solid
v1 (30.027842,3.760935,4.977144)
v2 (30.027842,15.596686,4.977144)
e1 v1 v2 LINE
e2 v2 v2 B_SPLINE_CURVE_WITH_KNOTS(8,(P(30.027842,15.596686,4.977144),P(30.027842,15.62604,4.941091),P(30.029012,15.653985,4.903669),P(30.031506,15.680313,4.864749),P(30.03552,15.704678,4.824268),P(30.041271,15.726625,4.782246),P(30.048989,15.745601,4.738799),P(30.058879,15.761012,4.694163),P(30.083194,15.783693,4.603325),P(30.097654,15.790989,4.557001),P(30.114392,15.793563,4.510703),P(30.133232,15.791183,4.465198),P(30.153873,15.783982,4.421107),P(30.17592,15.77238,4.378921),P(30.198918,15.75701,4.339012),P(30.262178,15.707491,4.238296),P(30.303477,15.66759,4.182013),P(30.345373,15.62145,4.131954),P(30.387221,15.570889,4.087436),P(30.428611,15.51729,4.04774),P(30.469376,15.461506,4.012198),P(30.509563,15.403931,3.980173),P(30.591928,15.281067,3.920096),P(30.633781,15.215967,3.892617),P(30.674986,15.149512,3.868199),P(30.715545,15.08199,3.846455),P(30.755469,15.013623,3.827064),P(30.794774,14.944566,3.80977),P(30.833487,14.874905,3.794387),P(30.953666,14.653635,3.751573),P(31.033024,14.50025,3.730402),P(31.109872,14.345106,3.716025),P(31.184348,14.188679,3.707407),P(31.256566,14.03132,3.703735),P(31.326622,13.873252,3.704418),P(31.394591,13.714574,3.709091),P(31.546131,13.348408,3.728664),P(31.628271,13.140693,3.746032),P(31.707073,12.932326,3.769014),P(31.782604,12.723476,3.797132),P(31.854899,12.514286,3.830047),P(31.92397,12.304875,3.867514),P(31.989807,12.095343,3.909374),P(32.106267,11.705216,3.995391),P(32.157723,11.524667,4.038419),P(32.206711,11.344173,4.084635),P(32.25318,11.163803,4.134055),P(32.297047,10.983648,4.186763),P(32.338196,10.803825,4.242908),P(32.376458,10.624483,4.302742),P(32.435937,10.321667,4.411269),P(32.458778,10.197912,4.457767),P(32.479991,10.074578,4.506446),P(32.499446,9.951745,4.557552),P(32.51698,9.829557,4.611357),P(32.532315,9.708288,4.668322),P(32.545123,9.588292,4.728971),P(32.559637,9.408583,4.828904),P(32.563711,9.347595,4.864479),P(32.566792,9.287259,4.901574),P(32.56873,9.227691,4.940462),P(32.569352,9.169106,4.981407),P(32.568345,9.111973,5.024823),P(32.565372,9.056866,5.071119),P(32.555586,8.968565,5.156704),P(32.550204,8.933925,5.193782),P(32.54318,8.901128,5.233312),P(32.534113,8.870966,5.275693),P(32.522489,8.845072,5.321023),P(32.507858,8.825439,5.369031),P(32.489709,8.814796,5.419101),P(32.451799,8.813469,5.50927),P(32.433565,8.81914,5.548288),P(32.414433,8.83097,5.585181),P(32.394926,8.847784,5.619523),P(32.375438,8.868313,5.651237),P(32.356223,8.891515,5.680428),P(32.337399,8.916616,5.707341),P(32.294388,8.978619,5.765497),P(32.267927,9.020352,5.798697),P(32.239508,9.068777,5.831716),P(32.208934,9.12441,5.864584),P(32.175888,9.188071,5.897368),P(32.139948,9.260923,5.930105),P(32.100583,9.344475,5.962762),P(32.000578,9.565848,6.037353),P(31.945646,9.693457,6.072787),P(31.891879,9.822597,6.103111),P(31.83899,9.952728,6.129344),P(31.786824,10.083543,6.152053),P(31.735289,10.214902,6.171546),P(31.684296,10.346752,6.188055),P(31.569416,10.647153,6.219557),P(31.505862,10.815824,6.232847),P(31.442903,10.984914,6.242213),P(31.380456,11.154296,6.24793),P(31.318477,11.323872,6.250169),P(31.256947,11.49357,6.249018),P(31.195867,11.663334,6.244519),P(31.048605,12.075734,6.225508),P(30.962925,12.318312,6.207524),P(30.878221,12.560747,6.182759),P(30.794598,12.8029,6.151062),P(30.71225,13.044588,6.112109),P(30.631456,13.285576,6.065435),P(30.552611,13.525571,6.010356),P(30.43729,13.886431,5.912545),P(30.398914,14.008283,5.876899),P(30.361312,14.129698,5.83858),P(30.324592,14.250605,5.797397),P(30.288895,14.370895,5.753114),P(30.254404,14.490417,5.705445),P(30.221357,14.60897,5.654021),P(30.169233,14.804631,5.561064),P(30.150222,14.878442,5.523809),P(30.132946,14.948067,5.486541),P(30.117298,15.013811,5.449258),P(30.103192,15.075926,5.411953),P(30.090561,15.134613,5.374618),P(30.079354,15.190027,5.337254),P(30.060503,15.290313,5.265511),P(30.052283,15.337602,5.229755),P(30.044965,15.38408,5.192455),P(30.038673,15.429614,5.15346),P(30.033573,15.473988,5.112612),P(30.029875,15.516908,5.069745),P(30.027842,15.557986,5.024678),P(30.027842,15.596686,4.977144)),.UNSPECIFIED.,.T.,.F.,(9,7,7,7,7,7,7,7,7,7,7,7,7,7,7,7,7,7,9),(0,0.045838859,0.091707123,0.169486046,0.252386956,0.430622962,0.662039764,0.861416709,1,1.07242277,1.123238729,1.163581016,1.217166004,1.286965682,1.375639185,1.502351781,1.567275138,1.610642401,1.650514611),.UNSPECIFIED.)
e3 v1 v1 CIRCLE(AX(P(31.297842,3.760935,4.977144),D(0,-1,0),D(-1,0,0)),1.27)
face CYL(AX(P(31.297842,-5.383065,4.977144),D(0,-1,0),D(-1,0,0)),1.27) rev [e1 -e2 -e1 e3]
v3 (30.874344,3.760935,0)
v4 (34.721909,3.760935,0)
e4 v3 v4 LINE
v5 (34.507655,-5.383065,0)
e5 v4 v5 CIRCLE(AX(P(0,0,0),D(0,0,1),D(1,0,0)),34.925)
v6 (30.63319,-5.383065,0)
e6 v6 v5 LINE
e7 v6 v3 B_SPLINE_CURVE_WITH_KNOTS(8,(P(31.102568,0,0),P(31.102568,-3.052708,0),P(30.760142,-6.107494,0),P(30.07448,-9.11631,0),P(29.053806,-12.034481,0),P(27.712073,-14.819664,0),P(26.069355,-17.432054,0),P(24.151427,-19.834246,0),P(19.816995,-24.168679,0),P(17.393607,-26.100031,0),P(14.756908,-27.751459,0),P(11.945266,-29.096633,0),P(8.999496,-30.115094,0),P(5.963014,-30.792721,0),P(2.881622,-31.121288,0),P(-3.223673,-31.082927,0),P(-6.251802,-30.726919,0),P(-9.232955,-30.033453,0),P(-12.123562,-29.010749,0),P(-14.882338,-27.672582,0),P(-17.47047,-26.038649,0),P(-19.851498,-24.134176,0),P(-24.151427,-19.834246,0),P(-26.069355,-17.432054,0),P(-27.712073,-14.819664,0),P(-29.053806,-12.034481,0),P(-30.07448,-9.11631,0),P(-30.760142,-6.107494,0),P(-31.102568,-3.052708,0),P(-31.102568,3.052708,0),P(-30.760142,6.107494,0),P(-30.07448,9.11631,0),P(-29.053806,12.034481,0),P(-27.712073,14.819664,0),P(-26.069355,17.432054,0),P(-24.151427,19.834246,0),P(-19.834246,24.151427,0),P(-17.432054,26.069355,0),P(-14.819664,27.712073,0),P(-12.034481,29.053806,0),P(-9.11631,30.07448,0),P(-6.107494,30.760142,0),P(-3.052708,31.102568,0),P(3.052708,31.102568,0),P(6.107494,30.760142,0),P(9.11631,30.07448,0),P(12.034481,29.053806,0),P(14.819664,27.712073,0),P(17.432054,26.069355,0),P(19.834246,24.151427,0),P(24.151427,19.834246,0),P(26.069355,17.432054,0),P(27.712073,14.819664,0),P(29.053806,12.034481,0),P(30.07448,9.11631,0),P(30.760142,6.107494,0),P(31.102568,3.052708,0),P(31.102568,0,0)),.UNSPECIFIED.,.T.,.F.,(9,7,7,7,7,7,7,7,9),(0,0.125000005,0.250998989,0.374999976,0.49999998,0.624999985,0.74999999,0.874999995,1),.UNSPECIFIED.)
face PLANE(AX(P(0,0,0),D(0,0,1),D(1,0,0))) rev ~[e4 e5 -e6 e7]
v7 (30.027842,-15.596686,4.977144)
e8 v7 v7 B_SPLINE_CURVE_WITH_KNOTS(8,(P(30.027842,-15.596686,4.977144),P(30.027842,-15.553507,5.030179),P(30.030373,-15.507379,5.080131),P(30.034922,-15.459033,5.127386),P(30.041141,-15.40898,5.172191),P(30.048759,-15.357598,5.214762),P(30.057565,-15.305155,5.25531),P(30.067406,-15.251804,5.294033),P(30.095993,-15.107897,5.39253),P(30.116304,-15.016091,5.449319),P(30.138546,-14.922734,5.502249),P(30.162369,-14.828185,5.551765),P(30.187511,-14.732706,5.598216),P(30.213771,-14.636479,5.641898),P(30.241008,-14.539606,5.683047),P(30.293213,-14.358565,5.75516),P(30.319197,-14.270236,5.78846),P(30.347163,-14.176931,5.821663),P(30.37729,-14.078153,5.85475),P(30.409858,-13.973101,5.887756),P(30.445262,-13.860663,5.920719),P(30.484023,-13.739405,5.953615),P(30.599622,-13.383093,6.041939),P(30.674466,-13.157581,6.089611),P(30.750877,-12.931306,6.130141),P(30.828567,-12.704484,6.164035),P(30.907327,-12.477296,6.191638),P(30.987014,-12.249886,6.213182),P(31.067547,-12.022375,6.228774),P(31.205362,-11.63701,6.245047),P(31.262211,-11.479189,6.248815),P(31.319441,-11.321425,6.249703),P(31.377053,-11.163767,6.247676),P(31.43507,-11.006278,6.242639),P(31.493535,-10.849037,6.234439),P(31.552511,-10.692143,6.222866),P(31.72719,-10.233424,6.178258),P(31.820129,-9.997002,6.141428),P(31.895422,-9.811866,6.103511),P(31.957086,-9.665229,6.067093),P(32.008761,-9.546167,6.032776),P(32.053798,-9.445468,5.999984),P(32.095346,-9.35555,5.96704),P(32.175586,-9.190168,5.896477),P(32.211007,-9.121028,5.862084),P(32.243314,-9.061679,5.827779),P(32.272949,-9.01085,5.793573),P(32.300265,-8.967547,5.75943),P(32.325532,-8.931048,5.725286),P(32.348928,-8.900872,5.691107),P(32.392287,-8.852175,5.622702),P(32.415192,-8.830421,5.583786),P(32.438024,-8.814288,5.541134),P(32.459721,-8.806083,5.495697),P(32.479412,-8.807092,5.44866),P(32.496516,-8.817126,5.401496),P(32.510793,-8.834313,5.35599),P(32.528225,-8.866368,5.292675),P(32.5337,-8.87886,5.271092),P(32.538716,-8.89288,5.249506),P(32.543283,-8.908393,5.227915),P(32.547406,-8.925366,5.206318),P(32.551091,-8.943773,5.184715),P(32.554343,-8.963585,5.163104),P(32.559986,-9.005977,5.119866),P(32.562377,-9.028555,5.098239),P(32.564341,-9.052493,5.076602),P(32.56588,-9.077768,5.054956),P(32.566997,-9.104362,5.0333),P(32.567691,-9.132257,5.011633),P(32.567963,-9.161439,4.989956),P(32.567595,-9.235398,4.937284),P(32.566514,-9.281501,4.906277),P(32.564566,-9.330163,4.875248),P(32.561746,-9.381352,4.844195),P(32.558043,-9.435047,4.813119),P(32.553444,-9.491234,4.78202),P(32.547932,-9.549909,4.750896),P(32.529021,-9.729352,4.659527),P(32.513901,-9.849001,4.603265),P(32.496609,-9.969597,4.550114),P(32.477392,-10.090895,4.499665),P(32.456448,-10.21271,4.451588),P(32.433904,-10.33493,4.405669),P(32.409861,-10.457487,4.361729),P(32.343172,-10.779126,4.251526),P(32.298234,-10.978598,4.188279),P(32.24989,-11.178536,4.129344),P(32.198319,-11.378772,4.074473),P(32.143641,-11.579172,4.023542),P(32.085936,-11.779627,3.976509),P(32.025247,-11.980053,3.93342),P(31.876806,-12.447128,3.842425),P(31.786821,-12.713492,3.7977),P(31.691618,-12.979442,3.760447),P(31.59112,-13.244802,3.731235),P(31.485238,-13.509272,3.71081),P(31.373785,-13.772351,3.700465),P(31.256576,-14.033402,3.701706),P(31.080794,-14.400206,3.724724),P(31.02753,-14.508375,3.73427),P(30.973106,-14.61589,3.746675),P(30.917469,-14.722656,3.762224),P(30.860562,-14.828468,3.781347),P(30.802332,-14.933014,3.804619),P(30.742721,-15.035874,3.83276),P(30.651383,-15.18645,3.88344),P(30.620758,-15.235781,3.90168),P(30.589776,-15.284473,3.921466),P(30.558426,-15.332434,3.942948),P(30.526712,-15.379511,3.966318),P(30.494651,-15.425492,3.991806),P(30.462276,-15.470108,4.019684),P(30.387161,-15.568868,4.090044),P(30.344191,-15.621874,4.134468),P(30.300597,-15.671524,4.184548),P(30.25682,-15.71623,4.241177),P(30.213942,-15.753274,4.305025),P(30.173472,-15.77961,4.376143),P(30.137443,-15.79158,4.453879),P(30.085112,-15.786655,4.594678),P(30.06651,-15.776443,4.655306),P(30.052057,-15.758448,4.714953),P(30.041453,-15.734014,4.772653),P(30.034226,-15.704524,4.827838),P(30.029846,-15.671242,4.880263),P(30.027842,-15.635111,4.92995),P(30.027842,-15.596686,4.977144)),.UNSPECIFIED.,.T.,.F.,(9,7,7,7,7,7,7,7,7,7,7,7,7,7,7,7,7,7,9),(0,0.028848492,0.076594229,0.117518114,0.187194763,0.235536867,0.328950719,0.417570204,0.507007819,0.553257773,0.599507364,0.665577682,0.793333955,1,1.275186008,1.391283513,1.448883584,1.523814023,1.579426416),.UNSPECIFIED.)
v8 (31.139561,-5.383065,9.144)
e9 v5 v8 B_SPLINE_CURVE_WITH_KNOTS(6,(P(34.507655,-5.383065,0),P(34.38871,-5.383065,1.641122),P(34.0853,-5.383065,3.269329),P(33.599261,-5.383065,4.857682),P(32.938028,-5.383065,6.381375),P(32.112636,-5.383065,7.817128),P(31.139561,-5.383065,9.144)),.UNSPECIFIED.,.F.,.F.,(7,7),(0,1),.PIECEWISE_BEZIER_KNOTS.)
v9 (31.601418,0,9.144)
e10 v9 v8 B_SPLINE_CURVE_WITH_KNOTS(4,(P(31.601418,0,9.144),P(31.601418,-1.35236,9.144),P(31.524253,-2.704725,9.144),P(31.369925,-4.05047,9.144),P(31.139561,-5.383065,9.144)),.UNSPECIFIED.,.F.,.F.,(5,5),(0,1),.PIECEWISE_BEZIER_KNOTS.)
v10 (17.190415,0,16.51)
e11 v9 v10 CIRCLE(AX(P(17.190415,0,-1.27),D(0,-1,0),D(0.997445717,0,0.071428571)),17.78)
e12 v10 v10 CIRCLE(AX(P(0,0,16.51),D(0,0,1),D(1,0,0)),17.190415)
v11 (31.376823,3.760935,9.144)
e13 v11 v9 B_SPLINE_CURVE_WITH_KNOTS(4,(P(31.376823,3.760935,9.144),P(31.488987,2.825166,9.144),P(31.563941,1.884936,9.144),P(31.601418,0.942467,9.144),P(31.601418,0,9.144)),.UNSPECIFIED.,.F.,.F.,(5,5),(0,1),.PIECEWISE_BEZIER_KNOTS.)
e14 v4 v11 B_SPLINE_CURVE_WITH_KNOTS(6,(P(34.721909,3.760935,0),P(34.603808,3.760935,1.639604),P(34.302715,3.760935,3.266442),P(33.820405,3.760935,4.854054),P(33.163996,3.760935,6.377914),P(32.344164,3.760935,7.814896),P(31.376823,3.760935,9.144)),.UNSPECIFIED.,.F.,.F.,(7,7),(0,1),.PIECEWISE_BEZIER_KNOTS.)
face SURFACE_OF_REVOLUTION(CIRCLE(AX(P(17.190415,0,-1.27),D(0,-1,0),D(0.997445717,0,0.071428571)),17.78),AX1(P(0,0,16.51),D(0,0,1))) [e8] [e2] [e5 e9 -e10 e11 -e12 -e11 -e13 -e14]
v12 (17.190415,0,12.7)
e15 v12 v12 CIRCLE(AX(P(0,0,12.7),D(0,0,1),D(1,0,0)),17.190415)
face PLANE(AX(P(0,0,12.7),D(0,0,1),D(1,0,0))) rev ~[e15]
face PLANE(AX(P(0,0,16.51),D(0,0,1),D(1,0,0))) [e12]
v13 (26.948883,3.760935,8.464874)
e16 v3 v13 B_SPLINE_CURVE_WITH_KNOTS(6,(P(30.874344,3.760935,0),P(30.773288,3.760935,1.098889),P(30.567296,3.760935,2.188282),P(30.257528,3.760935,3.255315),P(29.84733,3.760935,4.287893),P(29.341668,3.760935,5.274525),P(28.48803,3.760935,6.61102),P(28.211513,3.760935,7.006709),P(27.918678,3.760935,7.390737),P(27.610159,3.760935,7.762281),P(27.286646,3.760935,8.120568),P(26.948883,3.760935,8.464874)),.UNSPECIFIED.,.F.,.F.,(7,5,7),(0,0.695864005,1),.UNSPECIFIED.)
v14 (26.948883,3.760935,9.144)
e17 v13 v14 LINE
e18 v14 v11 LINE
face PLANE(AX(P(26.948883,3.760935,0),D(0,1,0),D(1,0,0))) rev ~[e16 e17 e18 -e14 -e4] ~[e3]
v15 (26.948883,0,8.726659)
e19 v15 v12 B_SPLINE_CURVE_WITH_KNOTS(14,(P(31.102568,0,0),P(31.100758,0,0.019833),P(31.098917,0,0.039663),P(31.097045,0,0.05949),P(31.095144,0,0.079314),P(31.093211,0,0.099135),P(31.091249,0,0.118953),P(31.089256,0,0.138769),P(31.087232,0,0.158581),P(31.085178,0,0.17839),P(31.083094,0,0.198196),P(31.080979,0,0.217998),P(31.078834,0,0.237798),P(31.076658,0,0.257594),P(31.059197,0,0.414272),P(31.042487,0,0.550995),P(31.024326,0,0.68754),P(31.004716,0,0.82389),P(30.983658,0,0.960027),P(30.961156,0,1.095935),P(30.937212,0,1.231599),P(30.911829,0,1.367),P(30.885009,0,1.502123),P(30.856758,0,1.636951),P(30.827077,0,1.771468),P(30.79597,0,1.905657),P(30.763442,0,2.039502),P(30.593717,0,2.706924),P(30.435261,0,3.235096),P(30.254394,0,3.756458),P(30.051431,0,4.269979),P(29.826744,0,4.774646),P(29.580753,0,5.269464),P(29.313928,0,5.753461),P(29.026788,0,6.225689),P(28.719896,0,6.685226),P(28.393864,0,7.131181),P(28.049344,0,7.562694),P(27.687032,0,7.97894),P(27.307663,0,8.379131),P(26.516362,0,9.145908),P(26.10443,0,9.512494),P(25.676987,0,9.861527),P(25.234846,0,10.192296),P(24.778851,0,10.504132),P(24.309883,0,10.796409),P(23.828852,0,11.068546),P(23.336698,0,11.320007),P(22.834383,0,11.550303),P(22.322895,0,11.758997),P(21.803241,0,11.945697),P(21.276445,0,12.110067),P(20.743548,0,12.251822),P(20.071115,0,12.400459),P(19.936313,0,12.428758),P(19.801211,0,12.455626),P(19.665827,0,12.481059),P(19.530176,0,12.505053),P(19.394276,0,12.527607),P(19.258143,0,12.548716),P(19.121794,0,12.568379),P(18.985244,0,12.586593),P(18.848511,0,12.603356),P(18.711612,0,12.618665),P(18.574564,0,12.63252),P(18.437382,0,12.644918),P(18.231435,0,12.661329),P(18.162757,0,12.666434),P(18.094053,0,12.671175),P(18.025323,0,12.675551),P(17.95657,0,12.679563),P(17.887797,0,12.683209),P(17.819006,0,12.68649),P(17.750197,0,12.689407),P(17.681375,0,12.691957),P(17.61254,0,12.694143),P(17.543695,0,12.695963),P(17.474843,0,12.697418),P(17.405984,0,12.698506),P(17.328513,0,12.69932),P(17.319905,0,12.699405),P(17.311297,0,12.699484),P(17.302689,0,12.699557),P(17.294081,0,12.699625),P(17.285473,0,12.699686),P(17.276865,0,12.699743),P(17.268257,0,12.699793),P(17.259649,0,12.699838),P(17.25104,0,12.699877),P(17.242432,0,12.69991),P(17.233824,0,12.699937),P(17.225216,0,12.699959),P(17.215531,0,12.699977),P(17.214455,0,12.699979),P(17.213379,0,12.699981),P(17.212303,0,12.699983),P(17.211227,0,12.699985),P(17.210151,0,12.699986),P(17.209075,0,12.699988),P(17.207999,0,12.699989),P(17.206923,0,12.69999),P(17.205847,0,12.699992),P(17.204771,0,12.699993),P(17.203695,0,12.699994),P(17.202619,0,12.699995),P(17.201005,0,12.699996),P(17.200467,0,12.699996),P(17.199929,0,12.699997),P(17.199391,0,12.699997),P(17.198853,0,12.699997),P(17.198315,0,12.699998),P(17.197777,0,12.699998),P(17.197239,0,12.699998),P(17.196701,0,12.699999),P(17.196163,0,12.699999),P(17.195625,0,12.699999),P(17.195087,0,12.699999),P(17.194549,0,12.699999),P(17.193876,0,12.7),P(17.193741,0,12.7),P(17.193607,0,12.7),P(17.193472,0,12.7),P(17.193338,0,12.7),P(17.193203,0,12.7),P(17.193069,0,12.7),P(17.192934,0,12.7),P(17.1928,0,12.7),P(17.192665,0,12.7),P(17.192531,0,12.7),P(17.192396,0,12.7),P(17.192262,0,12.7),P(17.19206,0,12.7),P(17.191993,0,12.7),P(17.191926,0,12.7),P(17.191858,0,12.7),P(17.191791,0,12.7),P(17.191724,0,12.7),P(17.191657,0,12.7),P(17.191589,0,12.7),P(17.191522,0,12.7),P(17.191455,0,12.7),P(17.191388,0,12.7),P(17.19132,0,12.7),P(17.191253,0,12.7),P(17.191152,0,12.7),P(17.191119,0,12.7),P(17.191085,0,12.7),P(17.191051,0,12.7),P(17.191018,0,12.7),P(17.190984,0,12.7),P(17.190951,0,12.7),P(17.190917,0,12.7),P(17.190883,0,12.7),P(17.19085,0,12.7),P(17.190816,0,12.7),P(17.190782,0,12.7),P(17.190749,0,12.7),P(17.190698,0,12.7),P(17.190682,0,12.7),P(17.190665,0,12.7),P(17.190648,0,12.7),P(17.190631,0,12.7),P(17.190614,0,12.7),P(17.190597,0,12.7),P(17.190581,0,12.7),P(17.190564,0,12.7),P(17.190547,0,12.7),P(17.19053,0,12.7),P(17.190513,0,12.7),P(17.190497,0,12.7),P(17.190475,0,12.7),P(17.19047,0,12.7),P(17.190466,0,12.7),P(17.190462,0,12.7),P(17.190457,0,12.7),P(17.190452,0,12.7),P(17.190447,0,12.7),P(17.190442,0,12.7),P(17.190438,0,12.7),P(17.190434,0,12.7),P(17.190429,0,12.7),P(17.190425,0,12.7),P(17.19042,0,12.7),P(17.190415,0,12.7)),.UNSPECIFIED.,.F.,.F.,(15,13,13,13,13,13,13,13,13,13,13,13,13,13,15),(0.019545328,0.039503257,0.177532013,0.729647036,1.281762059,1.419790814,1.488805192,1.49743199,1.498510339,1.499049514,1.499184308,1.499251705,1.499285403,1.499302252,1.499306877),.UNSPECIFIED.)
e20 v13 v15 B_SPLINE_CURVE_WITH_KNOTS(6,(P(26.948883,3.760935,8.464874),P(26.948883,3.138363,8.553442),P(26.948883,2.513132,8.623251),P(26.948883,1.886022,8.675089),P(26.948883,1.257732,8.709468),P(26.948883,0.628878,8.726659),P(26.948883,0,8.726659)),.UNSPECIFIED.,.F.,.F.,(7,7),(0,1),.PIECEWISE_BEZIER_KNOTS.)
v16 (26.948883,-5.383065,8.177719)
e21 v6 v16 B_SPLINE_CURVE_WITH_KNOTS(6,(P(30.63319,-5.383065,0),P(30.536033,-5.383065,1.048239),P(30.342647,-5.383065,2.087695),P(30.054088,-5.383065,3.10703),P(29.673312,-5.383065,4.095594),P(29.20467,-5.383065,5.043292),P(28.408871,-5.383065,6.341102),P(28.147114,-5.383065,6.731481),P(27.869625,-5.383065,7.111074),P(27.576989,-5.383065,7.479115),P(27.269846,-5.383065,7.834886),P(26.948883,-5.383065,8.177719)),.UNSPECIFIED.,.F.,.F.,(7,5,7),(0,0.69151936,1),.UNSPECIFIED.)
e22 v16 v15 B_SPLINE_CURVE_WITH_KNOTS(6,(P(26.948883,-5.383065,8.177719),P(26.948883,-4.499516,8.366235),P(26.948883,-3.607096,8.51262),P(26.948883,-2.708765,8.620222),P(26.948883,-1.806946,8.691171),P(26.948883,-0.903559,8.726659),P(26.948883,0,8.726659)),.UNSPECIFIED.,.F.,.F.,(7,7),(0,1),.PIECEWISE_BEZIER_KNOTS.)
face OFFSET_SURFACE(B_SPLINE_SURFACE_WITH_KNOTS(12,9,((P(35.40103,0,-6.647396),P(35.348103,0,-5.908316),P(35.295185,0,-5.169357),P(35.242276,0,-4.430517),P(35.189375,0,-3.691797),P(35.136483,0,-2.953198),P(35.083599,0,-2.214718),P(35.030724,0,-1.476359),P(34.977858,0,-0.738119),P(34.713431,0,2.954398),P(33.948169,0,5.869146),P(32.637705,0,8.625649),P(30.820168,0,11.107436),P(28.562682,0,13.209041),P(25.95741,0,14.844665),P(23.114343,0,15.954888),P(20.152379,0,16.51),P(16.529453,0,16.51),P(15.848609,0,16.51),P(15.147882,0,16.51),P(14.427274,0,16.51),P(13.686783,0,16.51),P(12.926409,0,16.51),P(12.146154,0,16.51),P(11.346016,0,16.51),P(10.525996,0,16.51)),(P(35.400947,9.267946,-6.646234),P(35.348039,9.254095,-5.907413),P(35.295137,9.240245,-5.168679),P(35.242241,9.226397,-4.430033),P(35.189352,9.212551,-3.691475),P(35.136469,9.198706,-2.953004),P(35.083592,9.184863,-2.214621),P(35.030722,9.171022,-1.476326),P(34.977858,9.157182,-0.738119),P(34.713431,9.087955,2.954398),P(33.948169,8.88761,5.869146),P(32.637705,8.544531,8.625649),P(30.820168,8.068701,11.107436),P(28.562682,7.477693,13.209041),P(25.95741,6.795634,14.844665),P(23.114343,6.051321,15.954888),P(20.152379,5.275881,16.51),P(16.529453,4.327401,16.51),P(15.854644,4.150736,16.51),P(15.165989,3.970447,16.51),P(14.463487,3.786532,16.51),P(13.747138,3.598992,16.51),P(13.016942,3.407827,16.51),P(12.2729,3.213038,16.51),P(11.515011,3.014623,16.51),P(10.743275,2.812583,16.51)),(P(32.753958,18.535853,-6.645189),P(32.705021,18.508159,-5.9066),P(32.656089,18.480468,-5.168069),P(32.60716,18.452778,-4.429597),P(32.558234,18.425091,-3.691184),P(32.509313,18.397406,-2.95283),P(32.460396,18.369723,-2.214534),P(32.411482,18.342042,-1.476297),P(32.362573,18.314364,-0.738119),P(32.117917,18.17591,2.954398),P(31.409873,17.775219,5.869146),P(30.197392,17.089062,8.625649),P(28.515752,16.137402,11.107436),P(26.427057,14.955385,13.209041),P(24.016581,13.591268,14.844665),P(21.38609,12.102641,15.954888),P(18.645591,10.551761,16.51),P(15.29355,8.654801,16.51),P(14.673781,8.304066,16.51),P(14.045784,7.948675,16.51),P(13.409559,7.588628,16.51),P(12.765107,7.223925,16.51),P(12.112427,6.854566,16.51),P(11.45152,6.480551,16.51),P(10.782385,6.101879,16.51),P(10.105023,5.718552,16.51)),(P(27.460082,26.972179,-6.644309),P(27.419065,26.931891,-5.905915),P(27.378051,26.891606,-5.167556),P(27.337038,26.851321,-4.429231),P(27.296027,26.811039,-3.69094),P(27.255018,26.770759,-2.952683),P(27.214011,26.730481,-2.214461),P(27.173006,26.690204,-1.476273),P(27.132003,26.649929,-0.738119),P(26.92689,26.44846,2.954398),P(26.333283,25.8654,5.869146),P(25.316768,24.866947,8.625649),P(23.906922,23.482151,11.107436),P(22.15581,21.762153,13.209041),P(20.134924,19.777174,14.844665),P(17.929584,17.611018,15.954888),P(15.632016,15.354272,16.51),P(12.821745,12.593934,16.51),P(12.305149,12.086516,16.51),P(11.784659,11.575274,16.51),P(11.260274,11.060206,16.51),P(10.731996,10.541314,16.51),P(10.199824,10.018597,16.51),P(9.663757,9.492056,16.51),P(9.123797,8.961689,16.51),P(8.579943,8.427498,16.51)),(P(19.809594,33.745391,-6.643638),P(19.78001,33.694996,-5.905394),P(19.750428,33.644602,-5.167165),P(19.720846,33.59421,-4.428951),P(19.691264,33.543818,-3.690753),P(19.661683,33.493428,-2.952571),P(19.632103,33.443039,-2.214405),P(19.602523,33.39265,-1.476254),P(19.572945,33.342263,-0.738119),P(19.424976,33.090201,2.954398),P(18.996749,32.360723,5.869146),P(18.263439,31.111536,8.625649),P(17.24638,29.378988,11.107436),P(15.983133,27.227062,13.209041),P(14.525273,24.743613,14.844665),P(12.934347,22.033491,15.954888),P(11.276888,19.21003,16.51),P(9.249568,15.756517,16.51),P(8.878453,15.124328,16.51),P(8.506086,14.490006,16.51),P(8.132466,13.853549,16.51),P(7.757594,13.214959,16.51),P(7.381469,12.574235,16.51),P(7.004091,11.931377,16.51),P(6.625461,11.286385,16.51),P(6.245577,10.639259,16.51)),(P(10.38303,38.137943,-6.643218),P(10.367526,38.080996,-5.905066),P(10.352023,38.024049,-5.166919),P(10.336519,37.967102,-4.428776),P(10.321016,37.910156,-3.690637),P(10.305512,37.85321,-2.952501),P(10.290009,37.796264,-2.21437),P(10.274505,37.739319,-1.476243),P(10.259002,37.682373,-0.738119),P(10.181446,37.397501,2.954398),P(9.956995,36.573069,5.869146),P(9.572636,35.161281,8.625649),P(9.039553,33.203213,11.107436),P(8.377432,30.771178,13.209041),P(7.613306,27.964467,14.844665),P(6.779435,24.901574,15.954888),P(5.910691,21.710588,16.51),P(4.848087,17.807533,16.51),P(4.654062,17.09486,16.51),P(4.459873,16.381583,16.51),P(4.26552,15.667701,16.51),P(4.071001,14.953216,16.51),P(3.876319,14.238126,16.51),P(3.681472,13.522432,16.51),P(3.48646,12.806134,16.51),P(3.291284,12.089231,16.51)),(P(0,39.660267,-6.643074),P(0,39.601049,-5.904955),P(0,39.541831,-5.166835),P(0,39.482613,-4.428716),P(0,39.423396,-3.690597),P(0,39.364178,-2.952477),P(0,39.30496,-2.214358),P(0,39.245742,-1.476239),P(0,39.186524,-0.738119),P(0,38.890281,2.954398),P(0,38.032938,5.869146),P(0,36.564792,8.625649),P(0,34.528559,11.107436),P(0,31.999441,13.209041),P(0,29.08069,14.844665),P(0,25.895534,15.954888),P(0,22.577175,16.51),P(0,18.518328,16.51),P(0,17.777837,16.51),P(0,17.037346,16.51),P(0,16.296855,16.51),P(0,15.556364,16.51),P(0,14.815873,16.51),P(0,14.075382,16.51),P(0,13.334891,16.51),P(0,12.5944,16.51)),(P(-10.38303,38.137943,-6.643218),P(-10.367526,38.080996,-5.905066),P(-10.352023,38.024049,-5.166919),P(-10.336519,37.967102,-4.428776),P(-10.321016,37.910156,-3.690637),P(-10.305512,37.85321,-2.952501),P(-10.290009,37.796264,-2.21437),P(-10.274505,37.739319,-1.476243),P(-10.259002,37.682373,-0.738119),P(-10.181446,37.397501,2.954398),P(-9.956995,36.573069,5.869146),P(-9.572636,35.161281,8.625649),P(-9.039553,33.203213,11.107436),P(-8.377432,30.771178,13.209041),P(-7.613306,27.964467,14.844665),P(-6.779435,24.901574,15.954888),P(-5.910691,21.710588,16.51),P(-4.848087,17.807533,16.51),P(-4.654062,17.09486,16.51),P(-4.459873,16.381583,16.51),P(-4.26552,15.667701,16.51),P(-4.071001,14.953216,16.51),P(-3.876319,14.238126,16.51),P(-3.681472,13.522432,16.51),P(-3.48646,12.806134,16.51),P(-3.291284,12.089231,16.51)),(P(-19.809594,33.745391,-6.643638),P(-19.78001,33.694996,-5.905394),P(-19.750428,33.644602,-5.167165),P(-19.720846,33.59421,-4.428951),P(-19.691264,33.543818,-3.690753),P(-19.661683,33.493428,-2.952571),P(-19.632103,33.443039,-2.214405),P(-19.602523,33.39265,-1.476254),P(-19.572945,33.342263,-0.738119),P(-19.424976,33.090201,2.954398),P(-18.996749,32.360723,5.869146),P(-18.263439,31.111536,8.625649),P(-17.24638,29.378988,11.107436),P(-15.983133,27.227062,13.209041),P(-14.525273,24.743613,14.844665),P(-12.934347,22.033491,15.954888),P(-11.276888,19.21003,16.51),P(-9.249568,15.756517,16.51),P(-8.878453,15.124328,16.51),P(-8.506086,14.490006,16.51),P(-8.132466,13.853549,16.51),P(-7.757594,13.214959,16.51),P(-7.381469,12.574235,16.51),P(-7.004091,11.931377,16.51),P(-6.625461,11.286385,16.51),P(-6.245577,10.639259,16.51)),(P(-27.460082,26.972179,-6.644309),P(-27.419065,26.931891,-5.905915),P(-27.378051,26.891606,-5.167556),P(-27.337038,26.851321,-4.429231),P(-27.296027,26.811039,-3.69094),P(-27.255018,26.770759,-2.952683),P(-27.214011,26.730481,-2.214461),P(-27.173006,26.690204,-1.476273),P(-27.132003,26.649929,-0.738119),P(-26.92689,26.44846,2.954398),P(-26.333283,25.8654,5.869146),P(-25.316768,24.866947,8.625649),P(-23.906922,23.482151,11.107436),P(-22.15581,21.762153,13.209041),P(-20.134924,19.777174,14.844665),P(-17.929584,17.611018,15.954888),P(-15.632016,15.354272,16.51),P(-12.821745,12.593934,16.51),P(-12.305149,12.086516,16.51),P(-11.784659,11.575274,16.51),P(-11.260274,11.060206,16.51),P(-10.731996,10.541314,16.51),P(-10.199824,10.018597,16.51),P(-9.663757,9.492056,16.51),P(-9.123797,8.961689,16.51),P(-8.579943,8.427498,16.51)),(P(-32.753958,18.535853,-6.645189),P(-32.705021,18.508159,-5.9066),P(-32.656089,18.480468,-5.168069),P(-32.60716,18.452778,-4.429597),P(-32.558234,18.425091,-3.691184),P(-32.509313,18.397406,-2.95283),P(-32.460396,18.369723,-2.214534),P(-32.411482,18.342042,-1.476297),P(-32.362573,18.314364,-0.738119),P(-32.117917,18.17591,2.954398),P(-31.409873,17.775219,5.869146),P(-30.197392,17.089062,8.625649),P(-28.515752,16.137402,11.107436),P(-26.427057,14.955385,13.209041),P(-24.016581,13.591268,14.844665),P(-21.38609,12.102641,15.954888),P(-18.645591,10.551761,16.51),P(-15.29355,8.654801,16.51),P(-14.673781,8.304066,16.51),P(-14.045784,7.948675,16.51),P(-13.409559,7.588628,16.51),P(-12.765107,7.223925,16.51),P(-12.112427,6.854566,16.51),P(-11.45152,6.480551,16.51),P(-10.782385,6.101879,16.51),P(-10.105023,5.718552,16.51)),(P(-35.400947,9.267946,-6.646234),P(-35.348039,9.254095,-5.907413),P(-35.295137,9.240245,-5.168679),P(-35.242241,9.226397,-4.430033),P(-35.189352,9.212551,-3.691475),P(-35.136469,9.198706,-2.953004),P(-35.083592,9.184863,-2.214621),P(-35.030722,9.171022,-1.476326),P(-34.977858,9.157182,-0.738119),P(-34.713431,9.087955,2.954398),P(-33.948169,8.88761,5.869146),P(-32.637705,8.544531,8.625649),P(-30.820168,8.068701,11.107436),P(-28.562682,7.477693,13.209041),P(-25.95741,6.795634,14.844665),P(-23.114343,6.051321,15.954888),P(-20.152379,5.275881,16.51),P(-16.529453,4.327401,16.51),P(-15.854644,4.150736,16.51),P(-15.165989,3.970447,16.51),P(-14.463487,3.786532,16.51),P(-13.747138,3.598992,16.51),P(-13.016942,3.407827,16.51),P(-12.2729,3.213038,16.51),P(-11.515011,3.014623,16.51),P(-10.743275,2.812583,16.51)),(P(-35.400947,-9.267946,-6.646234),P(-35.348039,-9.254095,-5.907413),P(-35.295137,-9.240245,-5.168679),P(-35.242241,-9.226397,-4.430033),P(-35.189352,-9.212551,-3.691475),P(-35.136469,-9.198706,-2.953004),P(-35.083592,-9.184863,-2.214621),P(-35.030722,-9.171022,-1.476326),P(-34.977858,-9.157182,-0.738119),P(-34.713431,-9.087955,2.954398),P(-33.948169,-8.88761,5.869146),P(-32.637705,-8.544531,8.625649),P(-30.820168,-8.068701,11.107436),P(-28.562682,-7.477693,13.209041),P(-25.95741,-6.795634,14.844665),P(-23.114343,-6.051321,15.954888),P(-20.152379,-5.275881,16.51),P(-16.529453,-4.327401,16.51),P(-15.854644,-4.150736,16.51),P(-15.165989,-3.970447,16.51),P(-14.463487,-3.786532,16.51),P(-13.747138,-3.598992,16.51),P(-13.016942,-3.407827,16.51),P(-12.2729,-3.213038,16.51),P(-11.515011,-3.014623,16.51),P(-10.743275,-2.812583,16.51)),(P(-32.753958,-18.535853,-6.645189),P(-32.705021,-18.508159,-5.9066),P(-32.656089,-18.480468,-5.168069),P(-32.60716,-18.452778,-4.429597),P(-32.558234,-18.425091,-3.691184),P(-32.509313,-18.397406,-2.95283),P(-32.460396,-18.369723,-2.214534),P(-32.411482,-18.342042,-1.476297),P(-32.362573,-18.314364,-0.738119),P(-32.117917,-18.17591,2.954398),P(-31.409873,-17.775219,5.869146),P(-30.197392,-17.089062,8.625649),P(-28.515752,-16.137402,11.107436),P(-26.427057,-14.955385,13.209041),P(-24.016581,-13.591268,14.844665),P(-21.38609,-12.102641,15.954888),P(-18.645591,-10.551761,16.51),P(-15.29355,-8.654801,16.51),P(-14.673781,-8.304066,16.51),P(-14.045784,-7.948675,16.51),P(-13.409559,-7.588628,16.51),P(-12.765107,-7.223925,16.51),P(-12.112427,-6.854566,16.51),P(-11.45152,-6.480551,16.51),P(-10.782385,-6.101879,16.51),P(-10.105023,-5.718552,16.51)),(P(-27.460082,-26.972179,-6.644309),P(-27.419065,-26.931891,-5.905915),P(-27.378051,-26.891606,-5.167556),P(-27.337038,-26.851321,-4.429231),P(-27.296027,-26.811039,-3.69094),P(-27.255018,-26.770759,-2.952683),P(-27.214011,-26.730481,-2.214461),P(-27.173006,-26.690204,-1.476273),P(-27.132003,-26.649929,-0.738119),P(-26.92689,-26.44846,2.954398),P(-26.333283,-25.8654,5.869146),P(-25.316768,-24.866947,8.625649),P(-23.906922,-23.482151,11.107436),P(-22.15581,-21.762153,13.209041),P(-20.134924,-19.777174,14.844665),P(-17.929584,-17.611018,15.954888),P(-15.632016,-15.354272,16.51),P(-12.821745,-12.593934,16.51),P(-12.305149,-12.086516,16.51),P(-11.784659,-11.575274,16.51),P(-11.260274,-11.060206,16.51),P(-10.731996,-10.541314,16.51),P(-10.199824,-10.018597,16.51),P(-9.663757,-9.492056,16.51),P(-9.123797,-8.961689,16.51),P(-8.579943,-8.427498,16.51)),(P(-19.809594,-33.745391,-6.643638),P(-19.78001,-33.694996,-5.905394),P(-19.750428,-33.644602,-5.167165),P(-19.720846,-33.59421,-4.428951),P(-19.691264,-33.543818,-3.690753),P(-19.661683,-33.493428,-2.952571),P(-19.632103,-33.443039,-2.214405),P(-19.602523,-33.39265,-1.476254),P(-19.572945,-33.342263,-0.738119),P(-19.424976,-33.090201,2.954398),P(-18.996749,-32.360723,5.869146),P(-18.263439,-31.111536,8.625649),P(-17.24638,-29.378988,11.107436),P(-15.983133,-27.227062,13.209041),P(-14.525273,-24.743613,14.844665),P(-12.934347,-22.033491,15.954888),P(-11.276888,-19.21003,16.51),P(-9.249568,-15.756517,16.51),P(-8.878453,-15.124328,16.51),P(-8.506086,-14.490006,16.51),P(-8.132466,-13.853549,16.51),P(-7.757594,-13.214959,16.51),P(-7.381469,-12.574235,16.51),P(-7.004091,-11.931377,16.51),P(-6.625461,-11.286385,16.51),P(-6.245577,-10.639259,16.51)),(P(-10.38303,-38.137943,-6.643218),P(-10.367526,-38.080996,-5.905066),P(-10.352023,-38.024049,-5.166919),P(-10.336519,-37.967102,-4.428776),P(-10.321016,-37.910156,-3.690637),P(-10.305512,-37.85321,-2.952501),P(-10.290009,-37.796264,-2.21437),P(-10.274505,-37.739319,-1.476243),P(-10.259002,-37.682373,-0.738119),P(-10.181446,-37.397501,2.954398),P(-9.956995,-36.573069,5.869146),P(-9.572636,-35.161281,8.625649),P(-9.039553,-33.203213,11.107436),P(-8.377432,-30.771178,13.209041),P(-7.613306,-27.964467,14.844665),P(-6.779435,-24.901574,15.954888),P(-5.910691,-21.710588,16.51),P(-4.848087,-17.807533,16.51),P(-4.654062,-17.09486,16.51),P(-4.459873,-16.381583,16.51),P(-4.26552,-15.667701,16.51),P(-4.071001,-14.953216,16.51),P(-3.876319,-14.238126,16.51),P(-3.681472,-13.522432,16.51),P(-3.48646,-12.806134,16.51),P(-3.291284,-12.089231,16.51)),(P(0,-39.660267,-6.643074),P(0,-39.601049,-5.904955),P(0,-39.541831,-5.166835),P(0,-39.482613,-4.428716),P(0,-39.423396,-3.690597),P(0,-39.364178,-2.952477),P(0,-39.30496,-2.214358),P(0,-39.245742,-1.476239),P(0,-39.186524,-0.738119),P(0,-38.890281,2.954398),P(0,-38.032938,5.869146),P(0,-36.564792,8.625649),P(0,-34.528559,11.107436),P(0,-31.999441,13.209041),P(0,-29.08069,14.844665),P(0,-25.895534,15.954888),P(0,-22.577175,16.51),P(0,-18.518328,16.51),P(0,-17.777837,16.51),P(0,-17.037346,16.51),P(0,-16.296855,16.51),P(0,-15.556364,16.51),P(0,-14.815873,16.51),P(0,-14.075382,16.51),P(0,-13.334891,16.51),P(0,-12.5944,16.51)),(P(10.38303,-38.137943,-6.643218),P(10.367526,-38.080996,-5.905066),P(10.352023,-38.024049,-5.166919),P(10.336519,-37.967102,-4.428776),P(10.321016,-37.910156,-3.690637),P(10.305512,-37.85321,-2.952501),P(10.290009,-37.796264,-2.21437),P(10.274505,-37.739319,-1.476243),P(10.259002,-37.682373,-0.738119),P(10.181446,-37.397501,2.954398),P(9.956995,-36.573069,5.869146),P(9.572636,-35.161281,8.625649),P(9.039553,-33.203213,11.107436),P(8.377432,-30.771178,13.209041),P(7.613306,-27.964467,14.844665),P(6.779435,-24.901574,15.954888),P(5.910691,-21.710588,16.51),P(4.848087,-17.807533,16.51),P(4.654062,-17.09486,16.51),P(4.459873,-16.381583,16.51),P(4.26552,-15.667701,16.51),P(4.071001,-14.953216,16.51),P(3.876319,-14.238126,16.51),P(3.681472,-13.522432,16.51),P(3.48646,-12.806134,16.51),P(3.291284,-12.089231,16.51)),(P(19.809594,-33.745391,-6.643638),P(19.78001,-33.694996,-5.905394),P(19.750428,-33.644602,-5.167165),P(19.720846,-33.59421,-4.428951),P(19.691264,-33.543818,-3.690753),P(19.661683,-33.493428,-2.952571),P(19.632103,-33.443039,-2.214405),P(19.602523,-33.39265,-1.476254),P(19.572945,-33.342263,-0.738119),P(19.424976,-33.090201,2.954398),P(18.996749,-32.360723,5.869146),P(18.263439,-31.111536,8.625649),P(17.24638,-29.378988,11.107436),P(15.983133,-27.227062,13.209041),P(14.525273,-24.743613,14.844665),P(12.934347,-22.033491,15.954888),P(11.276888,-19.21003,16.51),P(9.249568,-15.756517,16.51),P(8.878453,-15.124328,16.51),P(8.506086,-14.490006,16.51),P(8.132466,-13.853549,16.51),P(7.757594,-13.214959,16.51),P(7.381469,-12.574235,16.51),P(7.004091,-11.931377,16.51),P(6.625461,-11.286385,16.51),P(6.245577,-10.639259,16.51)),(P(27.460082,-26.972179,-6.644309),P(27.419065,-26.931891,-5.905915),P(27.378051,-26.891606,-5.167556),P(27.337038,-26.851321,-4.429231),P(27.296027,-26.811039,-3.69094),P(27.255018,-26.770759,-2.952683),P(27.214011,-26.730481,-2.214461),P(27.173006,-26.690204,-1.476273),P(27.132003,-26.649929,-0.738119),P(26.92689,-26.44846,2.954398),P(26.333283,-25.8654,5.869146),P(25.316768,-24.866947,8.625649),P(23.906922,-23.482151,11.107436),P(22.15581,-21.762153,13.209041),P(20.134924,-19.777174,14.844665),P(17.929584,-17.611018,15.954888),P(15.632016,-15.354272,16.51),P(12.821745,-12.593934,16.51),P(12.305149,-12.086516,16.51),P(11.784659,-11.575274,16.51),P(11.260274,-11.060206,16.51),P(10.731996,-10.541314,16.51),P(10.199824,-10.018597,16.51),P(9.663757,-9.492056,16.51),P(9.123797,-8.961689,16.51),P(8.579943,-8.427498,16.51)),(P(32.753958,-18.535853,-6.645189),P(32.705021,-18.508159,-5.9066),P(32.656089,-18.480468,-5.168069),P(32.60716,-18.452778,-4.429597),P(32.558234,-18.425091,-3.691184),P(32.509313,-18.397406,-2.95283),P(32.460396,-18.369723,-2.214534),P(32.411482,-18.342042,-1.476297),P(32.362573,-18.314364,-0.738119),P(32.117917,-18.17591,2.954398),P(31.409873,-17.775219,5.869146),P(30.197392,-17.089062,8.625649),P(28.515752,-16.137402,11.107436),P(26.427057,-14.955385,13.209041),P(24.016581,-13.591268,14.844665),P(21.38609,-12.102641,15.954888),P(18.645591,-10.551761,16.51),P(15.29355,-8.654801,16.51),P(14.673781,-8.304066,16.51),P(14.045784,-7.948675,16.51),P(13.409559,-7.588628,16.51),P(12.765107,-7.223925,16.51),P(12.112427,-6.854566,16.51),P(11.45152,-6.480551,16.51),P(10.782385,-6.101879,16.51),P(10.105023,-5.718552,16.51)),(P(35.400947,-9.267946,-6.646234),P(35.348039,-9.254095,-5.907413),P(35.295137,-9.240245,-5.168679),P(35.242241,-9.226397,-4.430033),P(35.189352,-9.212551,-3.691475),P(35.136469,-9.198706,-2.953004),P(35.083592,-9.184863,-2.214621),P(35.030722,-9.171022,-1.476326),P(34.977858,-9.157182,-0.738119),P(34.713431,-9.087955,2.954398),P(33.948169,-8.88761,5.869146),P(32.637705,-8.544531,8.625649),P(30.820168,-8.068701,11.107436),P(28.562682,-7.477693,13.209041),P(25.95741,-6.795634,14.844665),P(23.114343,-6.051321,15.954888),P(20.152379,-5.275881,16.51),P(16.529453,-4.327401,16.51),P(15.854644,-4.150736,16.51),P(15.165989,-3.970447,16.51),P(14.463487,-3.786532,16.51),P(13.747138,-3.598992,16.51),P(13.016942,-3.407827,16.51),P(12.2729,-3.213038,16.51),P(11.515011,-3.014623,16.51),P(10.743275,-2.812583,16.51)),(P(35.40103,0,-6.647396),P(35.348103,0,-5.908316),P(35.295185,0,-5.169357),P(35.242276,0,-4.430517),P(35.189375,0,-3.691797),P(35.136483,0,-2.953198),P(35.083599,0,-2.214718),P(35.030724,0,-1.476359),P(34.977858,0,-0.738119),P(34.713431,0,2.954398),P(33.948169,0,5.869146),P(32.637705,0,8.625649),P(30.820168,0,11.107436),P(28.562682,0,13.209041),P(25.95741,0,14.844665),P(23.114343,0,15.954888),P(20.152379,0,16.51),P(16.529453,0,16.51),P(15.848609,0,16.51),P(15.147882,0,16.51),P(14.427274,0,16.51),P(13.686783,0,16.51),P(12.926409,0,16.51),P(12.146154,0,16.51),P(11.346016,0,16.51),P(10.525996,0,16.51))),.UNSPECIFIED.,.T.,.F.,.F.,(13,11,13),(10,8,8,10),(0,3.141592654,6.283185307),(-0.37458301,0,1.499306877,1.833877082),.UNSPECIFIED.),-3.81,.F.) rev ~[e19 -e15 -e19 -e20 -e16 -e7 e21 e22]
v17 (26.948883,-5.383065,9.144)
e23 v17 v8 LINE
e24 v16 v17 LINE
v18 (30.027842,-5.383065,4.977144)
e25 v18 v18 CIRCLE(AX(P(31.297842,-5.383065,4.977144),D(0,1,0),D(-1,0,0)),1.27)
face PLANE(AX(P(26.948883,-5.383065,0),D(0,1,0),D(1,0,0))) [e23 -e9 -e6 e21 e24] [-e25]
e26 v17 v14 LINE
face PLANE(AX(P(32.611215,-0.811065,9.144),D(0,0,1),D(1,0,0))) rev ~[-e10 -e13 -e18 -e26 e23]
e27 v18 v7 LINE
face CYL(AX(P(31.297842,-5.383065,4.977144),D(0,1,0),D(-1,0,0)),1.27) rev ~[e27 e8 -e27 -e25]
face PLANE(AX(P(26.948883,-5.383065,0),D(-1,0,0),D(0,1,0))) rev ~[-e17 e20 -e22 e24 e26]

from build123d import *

# Parameters (mm, degrees)
F0_R          = 34.925
F1_DEPTH      = 16.51
F3_T          = -3.81
F4_W          = 11.3246641613
F4_H          = 9.144
F5_DEPTH      = 9.144
F6_R          = 1.27
F7_DEPTH      = 25.4
F7_DEPTH_BACK = 25.4


# Not quite as in the source:
# - a fillet or chamfer that OpenCascade refuses, or shapes differently, is made with other operations: its cross-section is extruded or revolved along the edge and cut away or added


with BuildPart() as f1:
    # F0 (on Top) → F1 (new body)
    with BuildSketch(Plane.XY):
        Circle(F0_R)
    extrude(amount=F1_DEPTH)

    # F2: fillet of radius 17.78 on 1 edges, made by hand

    # F2_s1 → F2_t2 (revolve, cut)
    with BuildSketch(Plane.XZ):
        with BuildLine():
            ThreePointArc((34.925, 0), (29.3054430024, 11.7436274728), (17.1904151444, 16.51))
            Line((17.1904151444, 16.51), (34.925, 16.51))
            Line((34.925, 16.51), (34.925, 0))
        make_face()
    revolve(axis=Axis((0, 0, 16.51), (0, 0, 1)), mode=Mode.SUBTRACT)

    # F3
    f3_openings = [f1.faces().sort_by_distance(p)[0] for p in [
        (0, 0, 0),
    ]]
    offset(amount=F3_T, openings=f3_openings)

    # F4 (on Top) → F5 (cut)
    with BuildSketch(Plane.XY):
        with Locations((32.6112154871, -0.8110651979)):
            Rectangle(F4_W, F4_H)
    extrude(amount=F5_DEPTH, mode=Mode.SUBTRACT)

    # F6 (on face) → F7 (cut, two sides)
    with BuildSketch(Plane(origin=(0, -5.3830651979, 0), x_dir=(-1, 0, 0), z_dir=(0, 1, 0))) as f7_sk:
        with Locations((-31.2978422578, 4.977144105)):
            Circle(F6_R)
    extrude(amount=-F7_DEPTH, mode=Mode.SUBTRACT)
    extrude(f7_sk.sketch, amount=F7_DEPTH_BACK, mode=Mode.SUBTRACT)


solid = f1.part
